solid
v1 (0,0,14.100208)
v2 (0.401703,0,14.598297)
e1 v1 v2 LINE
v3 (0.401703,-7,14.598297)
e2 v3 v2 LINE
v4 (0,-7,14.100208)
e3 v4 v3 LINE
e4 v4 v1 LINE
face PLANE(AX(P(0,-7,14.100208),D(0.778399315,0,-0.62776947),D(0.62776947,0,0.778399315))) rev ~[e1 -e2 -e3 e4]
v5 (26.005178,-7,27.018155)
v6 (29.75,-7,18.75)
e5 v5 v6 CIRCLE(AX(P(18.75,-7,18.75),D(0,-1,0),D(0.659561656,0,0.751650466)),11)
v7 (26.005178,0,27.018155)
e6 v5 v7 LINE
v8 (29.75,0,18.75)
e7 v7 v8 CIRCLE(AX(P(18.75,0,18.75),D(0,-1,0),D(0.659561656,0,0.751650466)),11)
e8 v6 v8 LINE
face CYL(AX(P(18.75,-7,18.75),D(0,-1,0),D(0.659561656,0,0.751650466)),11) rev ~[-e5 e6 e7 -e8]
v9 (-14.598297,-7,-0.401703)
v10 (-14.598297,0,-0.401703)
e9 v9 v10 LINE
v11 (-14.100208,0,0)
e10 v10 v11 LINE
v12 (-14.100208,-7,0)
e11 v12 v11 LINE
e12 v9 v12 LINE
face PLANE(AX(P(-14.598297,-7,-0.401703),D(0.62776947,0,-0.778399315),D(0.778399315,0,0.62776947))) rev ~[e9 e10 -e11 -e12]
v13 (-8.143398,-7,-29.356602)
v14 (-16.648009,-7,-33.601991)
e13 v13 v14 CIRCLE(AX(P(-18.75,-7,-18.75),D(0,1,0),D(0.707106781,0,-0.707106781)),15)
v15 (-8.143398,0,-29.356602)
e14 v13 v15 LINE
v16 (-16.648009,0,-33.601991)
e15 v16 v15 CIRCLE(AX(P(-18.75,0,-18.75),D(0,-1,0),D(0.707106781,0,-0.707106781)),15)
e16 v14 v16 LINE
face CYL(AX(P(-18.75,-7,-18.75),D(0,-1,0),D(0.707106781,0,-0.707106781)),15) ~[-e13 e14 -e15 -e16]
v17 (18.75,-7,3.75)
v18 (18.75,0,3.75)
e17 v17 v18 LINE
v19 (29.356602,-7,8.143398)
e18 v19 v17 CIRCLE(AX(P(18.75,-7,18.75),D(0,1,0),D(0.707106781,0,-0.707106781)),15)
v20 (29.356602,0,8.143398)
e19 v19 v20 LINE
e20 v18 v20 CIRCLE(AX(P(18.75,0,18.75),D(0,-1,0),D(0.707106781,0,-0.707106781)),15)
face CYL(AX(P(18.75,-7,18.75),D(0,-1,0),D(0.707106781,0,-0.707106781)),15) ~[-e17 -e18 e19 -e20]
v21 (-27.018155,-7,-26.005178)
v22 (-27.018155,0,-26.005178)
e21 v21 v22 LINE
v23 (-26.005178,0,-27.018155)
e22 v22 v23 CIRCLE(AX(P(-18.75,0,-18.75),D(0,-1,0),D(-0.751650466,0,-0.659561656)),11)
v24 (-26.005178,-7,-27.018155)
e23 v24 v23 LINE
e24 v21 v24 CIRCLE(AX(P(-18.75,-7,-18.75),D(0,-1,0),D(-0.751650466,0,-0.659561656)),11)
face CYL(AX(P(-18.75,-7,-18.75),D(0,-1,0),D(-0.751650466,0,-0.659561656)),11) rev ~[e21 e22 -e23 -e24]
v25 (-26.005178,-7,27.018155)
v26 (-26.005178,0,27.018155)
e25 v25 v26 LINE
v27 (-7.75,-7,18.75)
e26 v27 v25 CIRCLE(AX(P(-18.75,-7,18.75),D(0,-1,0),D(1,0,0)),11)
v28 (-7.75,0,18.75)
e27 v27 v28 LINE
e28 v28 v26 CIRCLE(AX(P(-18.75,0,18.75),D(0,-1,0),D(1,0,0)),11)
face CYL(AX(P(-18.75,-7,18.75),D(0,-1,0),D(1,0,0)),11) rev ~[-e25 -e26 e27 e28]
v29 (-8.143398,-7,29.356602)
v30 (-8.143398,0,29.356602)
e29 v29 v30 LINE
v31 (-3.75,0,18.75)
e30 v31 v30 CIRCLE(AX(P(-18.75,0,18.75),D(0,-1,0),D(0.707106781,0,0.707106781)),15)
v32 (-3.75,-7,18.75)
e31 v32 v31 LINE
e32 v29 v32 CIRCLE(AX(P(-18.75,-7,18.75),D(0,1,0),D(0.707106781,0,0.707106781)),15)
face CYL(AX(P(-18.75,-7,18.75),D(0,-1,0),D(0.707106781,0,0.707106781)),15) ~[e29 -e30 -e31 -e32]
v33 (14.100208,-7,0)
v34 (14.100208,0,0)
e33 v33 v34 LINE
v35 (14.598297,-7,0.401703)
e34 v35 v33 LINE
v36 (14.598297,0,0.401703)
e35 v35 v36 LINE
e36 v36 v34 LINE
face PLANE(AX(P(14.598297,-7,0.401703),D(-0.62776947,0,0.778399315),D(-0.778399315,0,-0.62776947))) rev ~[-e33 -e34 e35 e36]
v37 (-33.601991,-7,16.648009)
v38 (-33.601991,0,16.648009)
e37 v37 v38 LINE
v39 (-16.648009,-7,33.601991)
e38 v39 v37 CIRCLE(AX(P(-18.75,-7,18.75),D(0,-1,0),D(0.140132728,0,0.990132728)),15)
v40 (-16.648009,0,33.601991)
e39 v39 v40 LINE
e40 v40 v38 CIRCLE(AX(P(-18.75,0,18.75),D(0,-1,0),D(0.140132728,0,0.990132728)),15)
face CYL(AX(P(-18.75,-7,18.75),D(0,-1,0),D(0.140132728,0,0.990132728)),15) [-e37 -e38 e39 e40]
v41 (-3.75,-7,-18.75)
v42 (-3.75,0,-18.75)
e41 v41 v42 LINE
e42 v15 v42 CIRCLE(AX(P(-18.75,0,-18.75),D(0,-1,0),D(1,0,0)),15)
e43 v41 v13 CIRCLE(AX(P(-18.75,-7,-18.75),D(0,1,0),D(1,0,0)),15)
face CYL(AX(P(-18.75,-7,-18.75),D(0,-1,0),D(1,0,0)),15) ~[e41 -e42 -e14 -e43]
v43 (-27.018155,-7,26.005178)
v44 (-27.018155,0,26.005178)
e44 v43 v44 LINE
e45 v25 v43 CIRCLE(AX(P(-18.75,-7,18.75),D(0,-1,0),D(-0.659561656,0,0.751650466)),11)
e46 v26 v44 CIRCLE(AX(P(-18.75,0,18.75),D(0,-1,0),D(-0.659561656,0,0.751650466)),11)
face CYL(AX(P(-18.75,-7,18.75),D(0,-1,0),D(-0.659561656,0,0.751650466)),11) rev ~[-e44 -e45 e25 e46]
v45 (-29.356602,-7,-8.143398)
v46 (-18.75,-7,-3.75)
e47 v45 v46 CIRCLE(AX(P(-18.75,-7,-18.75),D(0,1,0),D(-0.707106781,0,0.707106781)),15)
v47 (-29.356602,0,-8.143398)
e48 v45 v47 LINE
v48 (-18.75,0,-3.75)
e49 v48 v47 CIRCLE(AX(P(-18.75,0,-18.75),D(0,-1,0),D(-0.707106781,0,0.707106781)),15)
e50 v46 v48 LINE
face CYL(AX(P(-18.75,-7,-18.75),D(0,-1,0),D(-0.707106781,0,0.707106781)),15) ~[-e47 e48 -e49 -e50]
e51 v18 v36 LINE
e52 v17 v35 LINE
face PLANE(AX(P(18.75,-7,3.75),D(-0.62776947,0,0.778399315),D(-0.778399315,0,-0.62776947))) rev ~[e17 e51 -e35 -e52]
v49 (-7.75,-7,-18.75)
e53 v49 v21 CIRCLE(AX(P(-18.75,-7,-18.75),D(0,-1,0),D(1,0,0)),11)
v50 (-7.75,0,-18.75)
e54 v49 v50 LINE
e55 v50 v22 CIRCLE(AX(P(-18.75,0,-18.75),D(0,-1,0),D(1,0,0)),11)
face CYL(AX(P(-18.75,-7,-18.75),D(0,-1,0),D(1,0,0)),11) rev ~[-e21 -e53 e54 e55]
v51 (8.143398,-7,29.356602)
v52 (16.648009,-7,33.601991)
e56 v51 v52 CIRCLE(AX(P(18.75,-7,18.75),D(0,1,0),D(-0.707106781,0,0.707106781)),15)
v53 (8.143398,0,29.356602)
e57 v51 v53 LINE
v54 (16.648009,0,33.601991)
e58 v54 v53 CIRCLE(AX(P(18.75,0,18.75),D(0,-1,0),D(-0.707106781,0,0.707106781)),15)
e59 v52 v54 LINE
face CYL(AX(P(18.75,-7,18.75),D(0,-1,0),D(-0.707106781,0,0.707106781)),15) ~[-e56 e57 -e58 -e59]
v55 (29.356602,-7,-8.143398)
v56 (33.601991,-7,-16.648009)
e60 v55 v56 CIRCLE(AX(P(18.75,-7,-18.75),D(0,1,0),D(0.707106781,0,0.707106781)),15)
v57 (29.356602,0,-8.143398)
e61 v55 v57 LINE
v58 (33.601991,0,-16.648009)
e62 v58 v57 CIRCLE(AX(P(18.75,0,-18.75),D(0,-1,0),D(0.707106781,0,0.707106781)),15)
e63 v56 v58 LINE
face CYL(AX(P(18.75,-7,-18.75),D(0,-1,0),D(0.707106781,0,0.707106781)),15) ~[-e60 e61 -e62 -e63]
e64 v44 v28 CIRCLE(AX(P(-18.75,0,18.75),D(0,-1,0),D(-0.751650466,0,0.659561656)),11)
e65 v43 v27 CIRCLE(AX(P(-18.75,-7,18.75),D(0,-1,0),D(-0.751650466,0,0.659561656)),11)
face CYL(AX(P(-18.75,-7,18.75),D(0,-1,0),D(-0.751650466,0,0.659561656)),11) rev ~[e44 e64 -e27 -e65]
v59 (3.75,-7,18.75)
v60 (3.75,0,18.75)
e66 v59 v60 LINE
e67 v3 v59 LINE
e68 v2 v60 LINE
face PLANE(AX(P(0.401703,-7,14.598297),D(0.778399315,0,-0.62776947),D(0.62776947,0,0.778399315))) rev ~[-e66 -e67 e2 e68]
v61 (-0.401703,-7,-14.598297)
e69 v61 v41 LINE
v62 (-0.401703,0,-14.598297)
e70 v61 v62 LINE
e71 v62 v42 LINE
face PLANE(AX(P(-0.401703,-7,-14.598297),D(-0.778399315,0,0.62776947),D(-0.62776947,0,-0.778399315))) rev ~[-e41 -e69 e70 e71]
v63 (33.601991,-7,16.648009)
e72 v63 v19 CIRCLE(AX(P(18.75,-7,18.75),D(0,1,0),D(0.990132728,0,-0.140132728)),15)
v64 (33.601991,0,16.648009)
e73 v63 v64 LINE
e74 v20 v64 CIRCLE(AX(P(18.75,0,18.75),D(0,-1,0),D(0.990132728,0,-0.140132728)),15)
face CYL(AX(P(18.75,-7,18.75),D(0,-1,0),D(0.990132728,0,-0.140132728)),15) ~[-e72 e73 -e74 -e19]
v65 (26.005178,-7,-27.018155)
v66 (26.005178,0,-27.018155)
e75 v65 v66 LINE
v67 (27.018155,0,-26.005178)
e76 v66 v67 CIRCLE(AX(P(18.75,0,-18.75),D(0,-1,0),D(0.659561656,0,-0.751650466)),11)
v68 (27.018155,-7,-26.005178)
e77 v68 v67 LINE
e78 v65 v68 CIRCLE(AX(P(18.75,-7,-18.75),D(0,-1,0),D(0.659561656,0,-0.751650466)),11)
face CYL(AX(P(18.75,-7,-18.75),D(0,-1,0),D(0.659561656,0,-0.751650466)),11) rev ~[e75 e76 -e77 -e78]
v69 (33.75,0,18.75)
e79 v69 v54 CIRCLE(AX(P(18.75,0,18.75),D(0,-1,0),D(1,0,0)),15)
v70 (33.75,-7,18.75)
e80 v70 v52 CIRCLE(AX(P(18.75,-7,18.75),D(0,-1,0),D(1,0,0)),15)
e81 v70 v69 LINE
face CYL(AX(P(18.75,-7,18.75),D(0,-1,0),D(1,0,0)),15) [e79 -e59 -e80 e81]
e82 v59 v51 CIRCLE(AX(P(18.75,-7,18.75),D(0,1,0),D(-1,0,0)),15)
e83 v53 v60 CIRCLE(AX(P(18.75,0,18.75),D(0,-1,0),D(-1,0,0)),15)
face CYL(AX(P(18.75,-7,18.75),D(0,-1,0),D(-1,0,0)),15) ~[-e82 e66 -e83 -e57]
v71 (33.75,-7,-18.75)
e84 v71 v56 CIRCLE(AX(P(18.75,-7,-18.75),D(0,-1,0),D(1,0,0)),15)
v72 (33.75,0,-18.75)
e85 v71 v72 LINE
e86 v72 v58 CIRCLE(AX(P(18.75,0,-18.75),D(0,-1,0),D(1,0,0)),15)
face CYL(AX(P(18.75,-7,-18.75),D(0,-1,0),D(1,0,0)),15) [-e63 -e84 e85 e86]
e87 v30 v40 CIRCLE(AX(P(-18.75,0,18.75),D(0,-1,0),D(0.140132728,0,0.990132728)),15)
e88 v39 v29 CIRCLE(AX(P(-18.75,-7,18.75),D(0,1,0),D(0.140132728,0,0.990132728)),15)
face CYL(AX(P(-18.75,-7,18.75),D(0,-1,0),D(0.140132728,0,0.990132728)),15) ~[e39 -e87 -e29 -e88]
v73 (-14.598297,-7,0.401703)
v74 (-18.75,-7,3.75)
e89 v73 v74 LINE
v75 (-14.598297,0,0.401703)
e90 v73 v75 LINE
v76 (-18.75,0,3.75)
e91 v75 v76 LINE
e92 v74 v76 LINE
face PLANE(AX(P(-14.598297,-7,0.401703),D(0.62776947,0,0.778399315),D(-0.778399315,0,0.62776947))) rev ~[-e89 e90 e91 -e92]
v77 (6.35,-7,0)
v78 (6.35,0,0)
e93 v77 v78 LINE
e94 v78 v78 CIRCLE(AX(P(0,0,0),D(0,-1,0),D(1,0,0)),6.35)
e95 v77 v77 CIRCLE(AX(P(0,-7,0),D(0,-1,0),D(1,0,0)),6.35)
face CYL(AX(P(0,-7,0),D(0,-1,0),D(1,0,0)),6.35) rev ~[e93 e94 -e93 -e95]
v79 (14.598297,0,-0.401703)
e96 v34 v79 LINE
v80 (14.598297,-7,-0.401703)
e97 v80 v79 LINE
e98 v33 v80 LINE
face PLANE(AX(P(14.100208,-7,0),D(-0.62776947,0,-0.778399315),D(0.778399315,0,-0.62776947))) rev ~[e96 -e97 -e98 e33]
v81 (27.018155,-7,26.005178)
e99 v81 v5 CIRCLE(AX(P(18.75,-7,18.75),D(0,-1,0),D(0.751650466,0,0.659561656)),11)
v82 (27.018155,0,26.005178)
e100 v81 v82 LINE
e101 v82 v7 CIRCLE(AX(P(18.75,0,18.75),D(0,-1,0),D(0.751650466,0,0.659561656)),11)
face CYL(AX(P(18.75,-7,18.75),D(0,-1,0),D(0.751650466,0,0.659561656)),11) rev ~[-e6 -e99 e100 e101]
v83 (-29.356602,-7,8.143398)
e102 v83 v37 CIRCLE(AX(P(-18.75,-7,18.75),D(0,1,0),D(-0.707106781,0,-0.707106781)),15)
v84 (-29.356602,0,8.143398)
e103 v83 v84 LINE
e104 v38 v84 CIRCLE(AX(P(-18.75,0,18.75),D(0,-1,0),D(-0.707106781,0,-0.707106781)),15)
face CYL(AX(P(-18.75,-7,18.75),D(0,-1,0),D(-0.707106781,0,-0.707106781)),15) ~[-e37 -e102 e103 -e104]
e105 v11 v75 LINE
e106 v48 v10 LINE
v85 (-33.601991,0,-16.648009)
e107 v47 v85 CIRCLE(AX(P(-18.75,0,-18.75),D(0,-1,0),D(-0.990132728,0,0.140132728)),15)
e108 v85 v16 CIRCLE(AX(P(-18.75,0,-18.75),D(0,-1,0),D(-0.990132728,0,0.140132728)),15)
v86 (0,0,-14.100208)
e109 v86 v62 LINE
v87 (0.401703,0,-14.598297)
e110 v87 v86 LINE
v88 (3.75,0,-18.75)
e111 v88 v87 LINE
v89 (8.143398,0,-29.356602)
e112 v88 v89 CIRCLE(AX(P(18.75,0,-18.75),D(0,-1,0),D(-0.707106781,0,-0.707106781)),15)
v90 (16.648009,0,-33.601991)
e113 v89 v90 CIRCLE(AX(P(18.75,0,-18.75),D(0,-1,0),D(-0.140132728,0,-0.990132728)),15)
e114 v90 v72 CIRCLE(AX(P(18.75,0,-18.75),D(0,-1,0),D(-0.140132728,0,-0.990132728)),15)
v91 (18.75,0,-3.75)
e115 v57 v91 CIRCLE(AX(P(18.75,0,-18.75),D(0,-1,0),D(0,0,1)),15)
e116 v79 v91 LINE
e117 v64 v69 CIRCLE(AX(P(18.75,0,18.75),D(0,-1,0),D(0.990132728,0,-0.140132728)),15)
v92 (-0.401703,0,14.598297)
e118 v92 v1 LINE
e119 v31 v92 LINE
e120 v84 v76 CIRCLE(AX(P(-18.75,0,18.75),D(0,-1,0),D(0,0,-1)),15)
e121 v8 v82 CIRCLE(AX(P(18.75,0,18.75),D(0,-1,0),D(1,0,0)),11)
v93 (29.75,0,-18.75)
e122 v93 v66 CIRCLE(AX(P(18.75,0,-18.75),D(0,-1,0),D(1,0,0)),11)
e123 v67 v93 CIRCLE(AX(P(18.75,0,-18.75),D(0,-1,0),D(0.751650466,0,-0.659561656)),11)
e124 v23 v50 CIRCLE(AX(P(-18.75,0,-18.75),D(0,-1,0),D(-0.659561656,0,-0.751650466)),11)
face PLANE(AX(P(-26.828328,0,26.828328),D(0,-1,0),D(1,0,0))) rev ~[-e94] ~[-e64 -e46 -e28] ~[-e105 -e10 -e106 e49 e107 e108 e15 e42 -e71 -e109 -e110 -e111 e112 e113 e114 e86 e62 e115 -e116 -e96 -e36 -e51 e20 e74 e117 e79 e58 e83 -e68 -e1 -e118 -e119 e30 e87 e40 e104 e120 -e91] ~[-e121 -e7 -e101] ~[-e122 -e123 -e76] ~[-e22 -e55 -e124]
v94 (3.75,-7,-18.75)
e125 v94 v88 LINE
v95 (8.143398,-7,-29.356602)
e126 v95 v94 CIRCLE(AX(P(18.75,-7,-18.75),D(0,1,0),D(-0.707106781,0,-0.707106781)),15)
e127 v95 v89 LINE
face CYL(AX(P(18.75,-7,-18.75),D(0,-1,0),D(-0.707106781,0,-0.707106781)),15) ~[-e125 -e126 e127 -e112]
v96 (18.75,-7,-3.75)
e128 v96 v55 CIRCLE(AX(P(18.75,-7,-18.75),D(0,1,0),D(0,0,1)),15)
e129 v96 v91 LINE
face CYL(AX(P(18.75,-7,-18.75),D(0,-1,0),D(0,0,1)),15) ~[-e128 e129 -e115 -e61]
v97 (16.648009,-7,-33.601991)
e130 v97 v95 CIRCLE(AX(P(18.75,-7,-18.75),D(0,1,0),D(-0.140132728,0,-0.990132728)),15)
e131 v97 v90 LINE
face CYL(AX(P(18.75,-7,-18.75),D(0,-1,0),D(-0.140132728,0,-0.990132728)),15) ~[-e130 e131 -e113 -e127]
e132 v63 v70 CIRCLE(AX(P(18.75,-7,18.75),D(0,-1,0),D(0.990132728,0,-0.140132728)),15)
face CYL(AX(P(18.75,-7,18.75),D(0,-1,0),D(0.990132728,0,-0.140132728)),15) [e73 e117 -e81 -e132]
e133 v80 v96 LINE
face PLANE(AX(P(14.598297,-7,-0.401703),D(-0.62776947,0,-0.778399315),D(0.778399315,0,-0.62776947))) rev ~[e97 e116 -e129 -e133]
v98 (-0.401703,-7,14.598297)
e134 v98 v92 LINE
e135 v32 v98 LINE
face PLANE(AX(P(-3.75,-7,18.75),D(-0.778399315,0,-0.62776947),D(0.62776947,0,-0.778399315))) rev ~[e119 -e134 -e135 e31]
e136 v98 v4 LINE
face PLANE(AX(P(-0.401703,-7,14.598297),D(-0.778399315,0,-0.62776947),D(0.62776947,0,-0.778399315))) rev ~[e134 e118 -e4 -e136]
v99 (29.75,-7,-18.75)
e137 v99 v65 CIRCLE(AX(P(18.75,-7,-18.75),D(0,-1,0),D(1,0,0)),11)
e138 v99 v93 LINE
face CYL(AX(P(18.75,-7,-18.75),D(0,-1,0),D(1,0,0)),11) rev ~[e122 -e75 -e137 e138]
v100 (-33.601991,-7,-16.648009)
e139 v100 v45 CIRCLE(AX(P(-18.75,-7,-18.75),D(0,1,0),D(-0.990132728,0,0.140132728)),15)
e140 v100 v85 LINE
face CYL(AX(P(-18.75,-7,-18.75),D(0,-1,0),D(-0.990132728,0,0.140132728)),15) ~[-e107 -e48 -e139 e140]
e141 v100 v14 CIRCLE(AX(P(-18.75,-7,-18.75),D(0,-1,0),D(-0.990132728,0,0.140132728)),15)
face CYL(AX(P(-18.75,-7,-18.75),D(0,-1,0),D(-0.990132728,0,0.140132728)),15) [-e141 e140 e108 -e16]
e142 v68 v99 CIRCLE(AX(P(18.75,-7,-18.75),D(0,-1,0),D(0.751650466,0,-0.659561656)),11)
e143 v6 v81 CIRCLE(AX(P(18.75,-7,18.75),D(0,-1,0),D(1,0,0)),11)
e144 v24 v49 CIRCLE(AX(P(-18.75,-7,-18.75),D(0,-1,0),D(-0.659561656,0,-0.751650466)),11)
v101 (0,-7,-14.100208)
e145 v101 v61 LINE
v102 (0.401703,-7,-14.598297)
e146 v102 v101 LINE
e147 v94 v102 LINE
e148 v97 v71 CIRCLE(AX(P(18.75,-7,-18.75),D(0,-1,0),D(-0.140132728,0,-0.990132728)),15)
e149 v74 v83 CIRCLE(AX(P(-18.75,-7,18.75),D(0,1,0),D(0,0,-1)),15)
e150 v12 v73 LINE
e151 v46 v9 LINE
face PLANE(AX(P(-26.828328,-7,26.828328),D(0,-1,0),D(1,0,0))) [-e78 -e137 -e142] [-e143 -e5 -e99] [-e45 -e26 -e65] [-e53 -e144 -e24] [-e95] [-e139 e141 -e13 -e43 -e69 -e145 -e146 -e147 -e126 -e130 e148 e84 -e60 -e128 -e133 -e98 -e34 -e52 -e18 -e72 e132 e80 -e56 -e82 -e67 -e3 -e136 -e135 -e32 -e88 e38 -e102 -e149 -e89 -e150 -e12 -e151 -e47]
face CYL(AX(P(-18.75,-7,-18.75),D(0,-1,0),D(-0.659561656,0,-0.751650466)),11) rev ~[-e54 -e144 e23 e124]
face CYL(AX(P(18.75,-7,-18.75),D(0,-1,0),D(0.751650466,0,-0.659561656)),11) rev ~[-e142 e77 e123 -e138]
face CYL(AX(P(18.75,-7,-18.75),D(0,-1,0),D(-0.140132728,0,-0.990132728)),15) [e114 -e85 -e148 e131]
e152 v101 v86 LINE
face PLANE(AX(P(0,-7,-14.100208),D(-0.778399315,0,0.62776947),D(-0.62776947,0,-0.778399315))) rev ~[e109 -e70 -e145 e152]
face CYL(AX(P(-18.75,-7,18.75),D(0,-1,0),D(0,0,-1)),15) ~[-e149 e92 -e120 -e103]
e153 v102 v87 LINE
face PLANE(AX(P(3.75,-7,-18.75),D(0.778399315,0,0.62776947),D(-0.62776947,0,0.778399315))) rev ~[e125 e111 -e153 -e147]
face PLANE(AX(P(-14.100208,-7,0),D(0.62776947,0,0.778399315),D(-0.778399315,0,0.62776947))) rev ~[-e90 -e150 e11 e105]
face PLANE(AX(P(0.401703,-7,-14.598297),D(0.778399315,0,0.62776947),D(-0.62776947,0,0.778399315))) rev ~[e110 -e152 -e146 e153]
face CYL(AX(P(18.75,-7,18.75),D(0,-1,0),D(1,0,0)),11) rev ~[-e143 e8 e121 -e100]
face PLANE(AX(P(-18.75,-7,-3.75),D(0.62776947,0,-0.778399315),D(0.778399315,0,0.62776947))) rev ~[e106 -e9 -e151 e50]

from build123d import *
from build123d import SkipClean  # not in build123d's __all__

# Parameters (mm, degrees)
F0_R     = 37.5
F1_DEPTH = 7
F2_R     = 6.35
F3_DEPTH = 7.001
F5_DEPTH = 7.001
F7_DEPTH = 7
F9_DEPTH = 7.001


with BuildPart() as f1:
    # F0 (on Front) → F1 (new body)
    with BuildSketch(Plane.XZ):
        Circle(F0_R)
    extrude(amount=F1_DEPTH)

    # F2 (on face) → F3 (cut, through all)
    with BuildSketch(Plane.XZ.offset(7)):
        Circle(F2_R)
    extrude(amount=-F3_DEPTH, mode=Mode.SUBTRACT)

    # F4 (on face) → F5 (cut, through all)
    with BuildSketch(Plane.XZ.offset(7)):
        with BuildLine():
            Line((-8.1433982822, 29.3566017178), (0, 37.5))
            ThreePointArc((0, 37.5), (-8.5491327229, 36.5124955281), (-16.6480090834, 33.6019909166))
            ThreePointArc((-16.6480090834, 33.6019909166), (-12.0505288232, 32.1707706914), (-8.1433982822, 29.3566017178))
        make_face()
        with BuildLine():
            ThreePointArc((16.6480090834, 33.6019909166), (8.5491327229, 36.5124955281), (0, 37.5))
            Line((0, 37.5), (8.1433982822, 29.3566017178))
            ThreePointArc((8.1433982822, 29.3566017178), (12.0505288232, 32.1707706914), (16.6480090834, 33.6019909166))
        make_face()
        with BuildLine():
            Line((0, 18.75), (0, 37.5))
            Line((0, 37.5), (-8.1433982822, 29.3566017178))
            ThreePointArc((-8.1433982822, 29.3566017178), (-4.8918070123, 24.4902514855), (-3.75, 18.75))
            Line((-3.75, 18.75), (0, 18.75))
        make_face()
        with BuildLine():
            Line((8.1433982822, 29.3566017178), (0, 37.5))
            Line((0, 37.5), (0, 18.75))
            Line((0, 18.75), (3.75, 18.75))
            ThreePointArc((3.75, 18.75), (4.8918070123, 24.4902514855), (8.1433982822, 29.3566017178))
        make_face()
        Polygon((0, 15), (0, 18.75), (-3.75, 18.75), align=None)
        Polygon((0, 15), (-3.75, 18.75), (-0.4017027864, 14.5982972136), align=None)
        Polygon((3.75, 18.75), (0, 18.75), (0, 15), align=None)
        Polygon((0.4017027864, 14.5982972136), (3.75, 18.75), (0, 15), align=None)
        with BuildLine():
            Line((-29.3566017178, -8.1433982822), (-37.5, 0))
            ThreePointArc((-37.5, 0), (-36.5124955281, -8.5491327229), (-33.6019909166, -16.6480090834))
            ThreePointArc((-33.6019909166, -16.6480090834), (-32.1707706914, -12.0505288232), (-29.3566017178, -8.1433982822))
        make_face()
        with BuildLine():
            ThreePointArc((-29.3566017178, 8.1433982822), (-32.1707706914, 12.0505288232), (-33.6019909166, 16.6480090834))
            ThreePointArc((-33.6019909166, 16.6480090834), (-36.5124955281, 8.5491327229), (-37.5, 0))
            Line((-37.5, 0), (-29.3566017178, 8.1433982822))
        make_face()
        with BuildLine():
            ThreePointArc((-18.75, 3.75), (-24.4902514855, 4.8918070123), (-29.3566017178, 8.1433982822))
            Line((-29.3566017178, 8.1433982822), (-37.5, 0))
            Line((-37.5, 0), (-18.75, 0))
            Line((-18.75, 0), (-18.75, 3.75))
        make_face()
        with BuildLine():
            Line((-18.75, 0), (-37.5, 0))
            Line((-37.5, 0), (-29.3566017178, -8.1433982822))
            ThreePointArc((-29.3566017178, -8.1433982822), (-24.4902514855, -4.8918070123), (-18.75, -3.75))
            Line((-18.75, -3.75), (-18.75, 0))
        make_face()
        Polygon((0.4017027864, 14.5982972136), (0, 15), (0, 14.1002080444), align=None)
        Polygon((0, 14.1002080444), (0, 15), (-0.4017027864, 14.5982972136), align=None)
        Polygon((-15, 0), (-18.75, 3.75), (-18.75, 0), align=None)
        Polygon((-14.5982972136, 0.4017027864), (-18.75, 3.75), (-15, 0), align=None)
        Polygon((-14.5982972136, 0.4017027864), (-15, 0), (-14.1002080444, 0), align=None)
        Polygon((-14.1002080444, 0), (-15, 0), (-14.5982972136, -0.4017027864), align=None)
        Polygon((-14.5982972136, -0.4017027864), (-15, 0), (-18.75, -3.75), align=None)
        Polygon((-15, 0), (-18.75, 0), (-18.75, -3.75), align=None)
        with BuildLine():
            ThreePointArc((-8.1433982822, -29.3566017178), (-12.0505288232, -32.1707706914), (-16.6480090834, -33.6019909166))
            ThreePointArc((-16.6480090834, -33.6019909166), (-8.5491327229, -36.5124955281), (0, -37.5))
            Line((0, -37.5), (-8.1433982822, -29.3566017178))
        make_face()
        with BuildLine():
            ThreePointArc((0, -37.5), (8.5491327229, -36.5124955281), (16.6480090834, -33.6019909166))
            ThreePointArc((16.6480090834, -33.6019909166), (12.0505288232, -32.1707706914), (8.1433982822, -29.3566017178))
            Line((8.1433982822, -29.3566017178), (0, -37.5))
        make_face()
        with BuildLine():
            Line((0, -37.5), (8.1433982822, -29.3566017178))
            ThreePointArc((8.1433982822, -29.3566017178), (4.8918070123, -24.4902514855), (3.75, -18.75))
            Line((3.75, -18.75), (0, -18.75))
            Line((0, -18.75), (0, -37.5))
        make_face()
        with BuildLine():
            Line((-8.1433982822, -29.3566017178), (0, -37.5))
            Line((0, -37.5), (0, -18.75))
            Line((0, -18.75), (-3.75, -18.75))
            ThreePointArc((-3.75, -18.75), (-4.8918070123, -24.4902514855), (-8.1433982822, -29.3566017178))
        make_face()
        Polygon((-0.4017027864, -14.5982972136), (0, -15), (0, -14.1002080444), align=None)
        Polygon((0, -14.1002080444), (0, -15), (0.4017027864, -14.5982972136), align=None)
        Polygon((0, -15), (3.75, -18.75), (0.4017027864, -14.5982972136), align=None)
        Polygon((-0.4017027864, -14.5982972136), (-3.75, -18.75), (0, -15), align=None)
        Polygon((0, -15), (-3.75, -18.75), (0, -18.75), align=None)
        Polygon((0, -18.75), (3.75, -18.75), (0, -15), align=None)
        with BuildLine():
            ThreePointArc((37.5, 0), (36.5124955281, 8.5491327229), (33.6019909166, 16.6480090834))
            ThreePointArc((33.6019909166, 16.6480090834), (32.1707706914, 12.0505288232), (29.3566017178, 8.1433982822))
            Line((29.3566017178, 8.1433982822), (37.5, 0))
        make_face()
        with BuildLine():
            Line((37.5, 0), (29.3566017178, 8.1433982822))
            ThreePointArc((29.3566017178, 8.1433982822), (24.4902514855, 4.8918070123), (18.75, 3.75))
            Line((18.75, 3.75), (18.75, 0))
            Line((18.75, 0), (37.5, 0))
        make_face()
        with BuildLine():
            ThreePointArc((33.6019909166, -16.6480090834), (36.5124955281, -8.5491327229), (37.5, 0))
            Line((37.5, 0), (29.3566017178, -8.1433982822))
            ThreePointArc((29.3566017178, -8.1433982822), (32.1707706914, -12.0505288232), (33.6019909166, -16.6480090834))
        make_face()
        with BuildLine():
            Line((29.3566017178, -8.1433982822), (37.5, 0))
            Line((37.5, 0), (18.75, 0))
            Line((18.75, 0), (18.75, -3.75))
            ThreePointArc((18.75, -3.75), (24.4902514855, -4.8918070123), (29.3566017178, -8.1433982822))
        make_face()
        Polygon((15, 0), (18.75, 3.75), (14.5982972136, 0.4017027864), align=None)
        Polygon((18.75, 0), (18.75, 3.75), (15, 0), align=None)
        Polygon((18.75, -3.75), (18.75, 0), (15, 0), align=None)
        Polygon((18.75, -3.75), (15, 0), (14.5982972136, -0.4017027864), align=None)
        Polygon((14.5982972136, -0.4017027864), (15, 0), (14.1002080444, 0), align=None)
        Polygon((14.1002080444, 0), (15, 0), (14.5982972136, 0.4017027864), align=None)
    extrude(amount=-F5_DEPTH, mode=Mode.SUBTRACT)

    # F6 (on face) → F7 (join)
    with BuildSketch(Plane.XZ.offset(7)):
        with BuildLine():
            ThreePointArc((-33.6019909166, 16.6480090834), (-26.5165042945, 26.5165042945), (-16.6480090834, 33.6019909166))
            ThreePointArc((-16.6480090834, 33.6019909166), (-29.3566017178, 29.3566017178), (-33.6019909166, 16.6480090834))
        make_face()
        with BuildLine():
            ThreePointArc((-16.6480090834, -33.6019909166), (-26.5165042945, -26.5165042945), (-33.6019909166, -16.6480090834))
            ThreePointArc((-33.6019909166, -16.6480090834), (-29.3566017178, -29.3566017178), (-16.6480090834, -33.6019909166))
        make_face()
        with BuildLine():
            ThreePointArc((33.75, -18.75), (33.7129519773, -17.6964022943), (33.6019909166, -16.6480090834))
            ThreePointArc((33.6019909166, -16.6480090834), (26.5165042945, -26.5165042945), (16.6480090834, -33.6019909166))
            ThreePointArc((16.6480090834, -33.6019909166), (28.5853987273, -30.0754108921), (33.75, -18.75))
        make_face()
        with BuildLine():
            ThreePointArc((33.75, 18.75), (28.5853987273, 30.0754108921), (16.6480090834, 33.6019909166))
            ThreePointArc((16.6480090834, 33.6019909166), (26.5165042945, 26.5165042945), (33.6019909166, 16.6480090834))
            ThreePointArc((33.6019909166, 16.6480090834), (33.7129519773, 17.6964022943), (33.75, 18.75))
        make_face()
    with SkipClean():  # cleaning this boolean's faces spoils the solid; the shape is the same uncleaned
        extrude(amount=-F7_DEPTH)

    # F8 (on face) → F9 (cut, through all)
    with BuildSketch(Plane.XZ.offset(7)):
        with BuildLine():
            ThreePointArc((-27.0181551222, 26.0051782112), (-26.5165042945, 26.5165042945), (-26.0051782112, 27.0181551222))
            ThreePointArc((-26.0051782112, 27.0181551222), (-26.5281745931, 26.5281745931), (-27.0181551222, 26.0051782112))
        make_face()
        with BuildLine():
            ThreePointArc((-27.0181551222, 26.0051782112), (-22.6262284283, 8.4555911694), (-7.75, 18.75))
            ThreePointArc((-7.75, 18.75), (-14.2116611146, 28.7701536995), (-26.0051782112, 27.0181551222))
            ThreePointArc((-26.0051782112, 27.0181551222), (-26.5165042945, 26.5165042945), (-27.0181551222, 26.0051782112))
        make_face()
        with BuildLine():
            ThreePointArc((27.0181551222, 26.0051782112), (26.5281745931, 26.5281745931), (26.0051782112, 27.0181551222))
            ThreePointArc((26.0051782112, 27.0181551222), (26.5165042945, 26.5165042945), (27.0181551222, 26.0051782112))
        make_face()
        with BuildLine():
            ThreePointArc((27.0181551222, 26.0051782112), (26.5165042945, 26.5165042945), (26.0051782112, 27.0181551222))
            ThreePointArc((26.0051782112, 27.0181551222), (8.7298463005, 14.2116611146), (29.75, 18.75))
            ThreePointArc((29.75, 18.75), (29.0444088306, 22.6262284283), (27.0181551222, 26.0051782112))
        make_face()
        with BuildLine():
            ThreePointArc((26.0051782112, -27.0181551222), (26.5281745931, -26.5281745931), (27.0181551222, -26.0051782112))
            ThreePointArc((27.0181551222, -26.0051782112), (26.5165042945, -26.5165042945), (26.0051782112, -27.0181551222))
        make_face()
        with BuildLine():
            ThreePointArc((26.0051782112, -27.0181551222), (26.5165042945, -26.5165042945), (27.0181551222, -26.0051782112))
            ThreePointArc((27.0181551222, -26.0051782112), (29.0444088306, -22.6262284283), (29.75, -18.75))
            ThreePointArc((29.75, -18.75), (8.7298463005, -14.2116611146), (26.0051782112, -27.0181551222))
        make_face()
        with BuildLine():
            ThreePointArc((-26.0051782112, -27.0181551222), (-26.5165042945, -26.5165042945), (-27.0181551222, -26.0051782112))
            ThreePointArc((-27.0181551222, -26.0051782112), (-26.5281745931, -26.5281745931), (-26.0051782112, -27.0181551222))
        make_face()
        with BuildLine():
            ThreePointArc((-7.75, -18.75), (-22.6262284283, -8.4555911694), (-27.0181551222, -26.0051782112))
            ThreePointArc((-27.0181551222, -26.0051782112), (-26.5165042945, -26.5165042945), (-26.0051782112, -27.0181551222))
            ThreePointArc((-26.0051782112, -27.0181551222), (-14.2116611146, -28.7701536995), (-7.75, -18.75))
        make_face()
    extrude(amount=-F9_DEPTH, mode=Mode.SUBTRACT)


solid = f1.part
